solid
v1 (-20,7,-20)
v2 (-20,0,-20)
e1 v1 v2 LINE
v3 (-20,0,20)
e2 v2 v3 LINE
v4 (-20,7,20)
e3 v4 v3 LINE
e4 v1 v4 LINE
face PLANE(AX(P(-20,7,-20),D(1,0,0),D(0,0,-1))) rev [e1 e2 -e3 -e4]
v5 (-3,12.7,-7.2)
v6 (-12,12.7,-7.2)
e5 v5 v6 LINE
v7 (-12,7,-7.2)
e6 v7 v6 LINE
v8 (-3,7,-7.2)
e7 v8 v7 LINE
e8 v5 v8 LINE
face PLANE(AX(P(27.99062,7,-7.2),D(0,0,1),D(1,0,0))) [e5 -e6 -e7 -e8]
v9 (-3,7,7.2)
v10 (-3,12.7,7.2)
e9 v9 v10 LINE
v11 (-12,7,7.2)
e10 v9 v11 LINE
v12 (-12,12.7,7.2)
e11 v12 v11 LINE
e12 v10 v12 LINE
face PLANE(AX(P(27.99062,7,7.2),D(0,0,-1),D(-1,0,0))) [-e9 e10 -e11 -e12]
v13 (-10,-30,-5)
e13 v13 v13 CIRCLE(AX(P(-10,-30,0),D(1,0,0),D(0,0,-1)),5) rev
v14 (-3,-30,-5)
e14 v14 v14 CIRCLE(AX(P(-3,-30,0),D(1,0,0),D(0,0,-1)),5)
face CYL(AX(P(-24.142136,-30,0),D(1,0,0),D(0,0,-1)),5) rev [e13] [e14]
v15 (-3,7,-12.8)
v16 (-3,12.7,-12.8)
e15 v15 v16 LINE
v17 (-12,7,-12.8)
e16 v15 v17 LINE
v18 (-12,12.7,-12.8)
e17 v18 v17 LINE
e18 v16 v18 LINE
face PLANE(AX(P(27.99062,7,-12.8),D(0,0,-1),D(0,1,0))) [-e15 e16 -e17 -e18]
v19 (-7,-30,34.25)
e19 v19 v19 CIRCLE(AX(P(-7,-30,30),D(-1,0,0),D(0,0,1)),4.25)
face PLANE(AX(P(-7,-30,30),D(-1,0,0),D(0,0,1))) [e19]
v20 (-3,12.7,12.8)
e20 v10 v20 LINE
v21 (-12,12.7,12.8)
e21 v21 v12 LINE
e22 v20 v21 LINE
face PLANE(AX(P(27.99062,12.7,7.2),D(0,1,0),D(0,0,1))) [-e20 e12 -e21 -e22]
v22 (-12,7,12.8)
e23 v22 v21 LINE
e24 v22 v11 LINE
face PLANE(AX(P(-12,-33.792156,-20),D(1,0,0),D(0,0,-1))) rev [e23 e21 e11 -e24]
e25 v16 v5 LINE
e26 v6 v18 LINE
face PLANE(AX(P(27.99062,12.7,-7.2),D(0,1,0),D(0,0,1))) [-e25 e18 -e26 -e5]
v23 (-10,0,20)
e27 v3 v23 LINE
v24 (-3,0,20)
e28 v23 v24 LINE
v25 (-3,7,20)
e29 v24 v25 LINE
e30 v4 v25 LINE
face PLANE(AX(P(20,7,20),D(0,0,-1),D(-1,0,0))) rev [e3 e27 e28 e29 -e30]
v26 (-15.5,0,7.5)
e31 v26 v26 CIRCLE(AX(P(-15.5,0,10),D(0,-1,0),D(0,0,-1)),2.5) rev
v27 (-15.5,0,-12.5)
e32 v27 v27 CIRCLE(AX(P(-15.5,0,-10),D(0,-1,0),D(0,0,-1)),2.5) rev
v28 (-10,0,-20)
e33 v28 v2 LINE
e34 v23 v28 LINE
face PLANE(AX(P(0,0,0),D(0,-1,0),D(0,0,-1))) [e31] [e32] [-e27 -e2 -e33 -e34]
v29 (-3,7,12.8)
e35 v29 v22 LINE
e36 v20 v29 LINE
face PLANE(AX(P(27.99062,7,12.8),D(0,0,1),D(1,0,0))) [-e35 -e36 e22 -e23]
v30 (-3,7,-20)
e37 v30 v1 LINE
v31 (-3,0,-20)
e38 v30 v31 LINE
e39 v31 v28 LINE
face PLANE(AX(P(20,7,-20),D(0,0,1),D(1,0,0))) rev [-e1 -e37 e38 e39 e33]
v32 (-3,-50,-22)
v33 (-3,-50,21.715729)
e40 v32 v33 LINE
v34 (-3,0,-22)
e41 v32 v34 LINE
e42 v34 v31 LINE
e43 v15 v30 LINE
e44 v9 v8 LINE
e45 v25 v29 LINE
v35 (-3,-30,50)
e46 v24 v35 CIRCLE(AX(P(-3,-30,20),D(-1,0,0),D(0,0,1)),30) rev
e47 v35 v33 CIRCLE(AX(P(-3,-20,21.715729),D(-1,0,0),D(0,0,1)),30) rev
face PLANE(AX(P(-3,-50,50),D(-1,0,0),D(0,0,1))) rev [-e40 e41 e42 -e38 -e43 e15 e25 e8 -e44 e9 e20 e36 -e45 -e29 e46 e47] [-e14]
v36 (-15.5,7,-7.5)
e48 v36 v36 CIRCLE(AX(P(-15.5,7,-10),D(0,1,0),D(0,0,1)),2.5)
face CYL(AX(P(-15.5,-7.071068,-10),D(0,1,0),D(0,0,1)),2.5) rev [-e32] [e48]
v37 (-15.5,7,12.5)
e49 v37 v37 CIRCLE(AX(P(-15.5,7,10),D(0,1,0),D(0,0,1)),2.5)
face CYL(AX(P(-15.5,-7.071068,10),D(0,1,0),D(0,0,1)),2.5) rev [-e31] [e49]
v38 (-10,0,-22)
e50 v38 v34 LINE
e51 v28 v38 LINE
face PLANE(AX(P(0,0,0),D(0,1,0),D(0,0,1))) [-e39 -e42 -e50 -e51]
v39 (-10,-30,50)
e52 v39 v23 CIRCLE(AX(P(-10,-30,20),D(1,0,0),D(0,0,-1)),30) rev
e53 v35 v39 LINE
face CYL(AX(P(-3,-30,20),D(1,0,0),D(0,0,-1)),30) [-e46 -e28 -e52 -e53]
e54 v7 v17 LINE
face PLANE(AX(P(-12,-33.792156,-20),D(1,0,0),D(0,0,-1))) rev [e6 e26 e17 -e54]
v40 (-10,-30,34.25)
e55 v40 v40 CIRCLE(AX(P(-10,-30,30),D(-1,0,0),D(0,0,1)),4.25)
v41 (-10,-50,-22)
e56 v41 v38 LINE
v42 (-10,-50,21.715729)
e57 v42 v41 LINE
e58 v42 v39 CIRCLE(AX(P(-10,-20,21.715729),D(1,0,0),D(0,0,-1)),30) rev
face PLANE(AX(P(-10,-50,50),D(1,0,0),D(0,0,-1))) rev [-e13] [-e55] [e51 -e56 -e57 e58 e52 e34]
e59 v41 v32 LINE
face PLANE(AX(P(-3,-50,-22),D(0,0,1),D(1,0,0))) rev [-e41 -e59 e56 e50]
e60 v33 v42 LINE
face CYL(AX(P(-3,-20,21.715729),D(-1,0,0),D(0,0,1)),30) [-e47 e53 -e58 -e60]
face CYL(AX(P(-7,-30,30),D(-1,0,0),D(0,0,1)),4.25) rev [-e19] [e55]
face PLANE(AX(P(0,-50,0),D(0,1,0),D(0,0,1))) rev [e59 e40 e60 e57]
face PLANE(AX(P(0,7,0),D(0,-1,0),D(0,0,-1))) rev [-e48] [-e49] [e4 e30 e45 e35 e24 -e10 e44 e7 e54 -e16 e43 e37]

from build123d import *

# Parameters (mm, degrees)
CROQUIS1_W              = 40
CROQUIS1_H              = 40
SALIENTE_EXTRUIR1_DEPTH = 7
CROQUIS3_W              = 5.6
CROQUIS3_H              = 5.7
SALIENTE_EXTRUIR3_DEPTH = 40
CROQUIS19_W             = 8
CROQUIS19_H             = 40
CORTAR_EXTRUIR5_DEPTH   = 5.7
CROQUIS20_R             = 2.5
CORTAR_EXTRUIR6_DEPTH   = 7
CROQUIS21_W             = 7
CROQUIS21_H             = 72
SALIENTE_EXTRUIR4_DEPTH = 50
CROQUIS22_R             = 5
CORTAR_EXTRUIR7_DEPTH   = 7
REDONDEO1_R             = 30
REDONDEO2_R             = 30
CROQUIS28_R             = 4.25
CORTAR_EXTRUIR11_DEPTH  = 3
CROQUIS29_W             = 113.908789422
CROQUIS29_H             = 183.564538758
CORTAR_EXTRUIR12_DEPTH  = 23


# Some blends are built 0.0001 mm under size
with BuildPart() as part:
    # Croquis1 → Saliente-Extruir1 (new body)
    with BuildSketch(Plane(origin=(0, 0, 0), x_dir=(1, 0, 0), z_dir=(0, 1, 0))):
        Rectangle(CROQUIS1_W, CROQUIS1_H)
    extrude(amount=SALIENTE_EXTRUIR1_DEPTH)

    # Croquis3 → Saliente-Extruir3 (add)
    with BuildSketch(Plane.ZY.offset(20)):
        with Locations((10, 9.85)):
            Rectangle(CROQUIS3_W, CROQUIS3_H)
        with Locations((-10, 9.85)):
            Rectangle(CROQUIS3_W, CROQUIS3_H)
    extrude(amount=-SALIENTE_EXTRUIR3_DEPTH)

    # Croquis19 → Cortar-Extruir5 (cut)
    with BuildSketch(Plane(origin=(0, 12.7, 0), x_dir=(1, 0, 0), z_dir=(0, 1, 0))):
        with Locations((-16, 0)):
            Rectangle(CROQUIS19_W, CROQUIS19_H)
        with Locations((16, 0)):
            Rectangle(CROQUIS19_W, CROQUIS19_H)
    extrude(amount=-CORTAR_EXTRUIR5_DEPTH, mode=Mode.SUBTRACT)

    # Croquis20 → Cortar-Extruir6 (cut)
    with BuildSketch(Plane(origin=(0, 7, 0), x_dir=(1, 0, 0), z_dir=(0, 1, 0))):
        with Locations(Location((-15.5, 10, 0), (0, 0, 270))):
            Circle(CROQUIS20_R)
        with Locations(Location((15.5, 10, 0), (0, 0, 270))):
            Circle(CROQUIS20_R)
        with Locations(Location((15.5, -10, 0), (0, 0, 270))):
            Circle(CROQUIS20_R)
        with Locations(Location((-15.5, -10, 0), (0, 0, 270))):
            Circle(CROQUIS20_R)
    extrude(amount=-CORTAR_EXTRUIR6_DEPTH, mode=Mode.SUBTRACT)

    # Croquis21 → Saliente-Extruir4 (add)
    with BuildSketch(Plane.XZ):
        with Locations((-6.5, 14)):
            Rectangle(CROQUIS21_W, CROQUIS21_H)
    extrude(amount=SALIENTE_EXTRUIR4_DEPTH)

    # Croquis22 → Cortar-Extruir7 (cut)
    with BuildSketch(Plane(origin=(-3, 0, 0), x_dir=(0, 0, -1), z_dir=(1, 0, 0))):
        with Locations((0, -30)):
            Circle(CROQUIS22_R)
    extrude(amount=-CORTAR_EXTRUIR7_DEPTH, mode=Mode.SUBTRACT)

    # Redondeo1
    redondeo1_edges = [part.edges().sort_by_distance(p)[0] for p in [
        (-6.5, 0, 50),
    ]]
    fillet(redondeo1_edges, radius=REDONDEO1_R - 0.0001)  # a hair under: the kernel refuses the full size

    # Redondeo2
    # the kernel refuses this fillet: 30 mm, written as the material it takes off along each edge
    with BuildSketch(Plane(origin=(67.710766507, -50, 50), x_dir=(0, 1, 0), z_dir=(-1, 0, 0))) as redondeo2_piece_1:
        with BuildLine():
            CenterArc((30, 28.284306603), REDONDEO2_R, 180, 70.528981937)
            Line((0, 28.284306603), (-0.6, 28.284306603))
            Line((-0.6, 28.284306603), (-0.6, 0))
            Line((-0.6, 0), (0, -0.6))
            ThreePointArc((0, -0.6), (10.00005, -0.6), (19.800102, -0.565686132))
            Line((19.800102, -0.565686132), (20.0001, 0))
        make_face()
    extrude(amount=148.421533013, mode=Mode.SUBTRACT)

    # Croquis28 → Cortar-Extruir11 (cut)
    with BuildSketch(Plane.ZY.offset(10)):
        with Locations((30, -30)):
            Circle(CROQUIS28_R)
    extrude(amount=-CORTAR_EXTRUIR11_DEPTH, mode=Mode.SUBTRACT)

    # Croquis29 → Cortar-Extruir12 (cut)
    with BuildSketch(Plane(origin=(20, 0, 0), x_dir=(0, 0, -1), z_dir=(1, 0, 0))):
        with Locations((0, 4.197692072)):
            Rectangle(CROQUIS29_W, CROQUIS29_H)
    extrude(amount=-CORTAR_EXTRUIR12_DEPTH, mode=Mode.SUBTRACT)


solid = part.part
